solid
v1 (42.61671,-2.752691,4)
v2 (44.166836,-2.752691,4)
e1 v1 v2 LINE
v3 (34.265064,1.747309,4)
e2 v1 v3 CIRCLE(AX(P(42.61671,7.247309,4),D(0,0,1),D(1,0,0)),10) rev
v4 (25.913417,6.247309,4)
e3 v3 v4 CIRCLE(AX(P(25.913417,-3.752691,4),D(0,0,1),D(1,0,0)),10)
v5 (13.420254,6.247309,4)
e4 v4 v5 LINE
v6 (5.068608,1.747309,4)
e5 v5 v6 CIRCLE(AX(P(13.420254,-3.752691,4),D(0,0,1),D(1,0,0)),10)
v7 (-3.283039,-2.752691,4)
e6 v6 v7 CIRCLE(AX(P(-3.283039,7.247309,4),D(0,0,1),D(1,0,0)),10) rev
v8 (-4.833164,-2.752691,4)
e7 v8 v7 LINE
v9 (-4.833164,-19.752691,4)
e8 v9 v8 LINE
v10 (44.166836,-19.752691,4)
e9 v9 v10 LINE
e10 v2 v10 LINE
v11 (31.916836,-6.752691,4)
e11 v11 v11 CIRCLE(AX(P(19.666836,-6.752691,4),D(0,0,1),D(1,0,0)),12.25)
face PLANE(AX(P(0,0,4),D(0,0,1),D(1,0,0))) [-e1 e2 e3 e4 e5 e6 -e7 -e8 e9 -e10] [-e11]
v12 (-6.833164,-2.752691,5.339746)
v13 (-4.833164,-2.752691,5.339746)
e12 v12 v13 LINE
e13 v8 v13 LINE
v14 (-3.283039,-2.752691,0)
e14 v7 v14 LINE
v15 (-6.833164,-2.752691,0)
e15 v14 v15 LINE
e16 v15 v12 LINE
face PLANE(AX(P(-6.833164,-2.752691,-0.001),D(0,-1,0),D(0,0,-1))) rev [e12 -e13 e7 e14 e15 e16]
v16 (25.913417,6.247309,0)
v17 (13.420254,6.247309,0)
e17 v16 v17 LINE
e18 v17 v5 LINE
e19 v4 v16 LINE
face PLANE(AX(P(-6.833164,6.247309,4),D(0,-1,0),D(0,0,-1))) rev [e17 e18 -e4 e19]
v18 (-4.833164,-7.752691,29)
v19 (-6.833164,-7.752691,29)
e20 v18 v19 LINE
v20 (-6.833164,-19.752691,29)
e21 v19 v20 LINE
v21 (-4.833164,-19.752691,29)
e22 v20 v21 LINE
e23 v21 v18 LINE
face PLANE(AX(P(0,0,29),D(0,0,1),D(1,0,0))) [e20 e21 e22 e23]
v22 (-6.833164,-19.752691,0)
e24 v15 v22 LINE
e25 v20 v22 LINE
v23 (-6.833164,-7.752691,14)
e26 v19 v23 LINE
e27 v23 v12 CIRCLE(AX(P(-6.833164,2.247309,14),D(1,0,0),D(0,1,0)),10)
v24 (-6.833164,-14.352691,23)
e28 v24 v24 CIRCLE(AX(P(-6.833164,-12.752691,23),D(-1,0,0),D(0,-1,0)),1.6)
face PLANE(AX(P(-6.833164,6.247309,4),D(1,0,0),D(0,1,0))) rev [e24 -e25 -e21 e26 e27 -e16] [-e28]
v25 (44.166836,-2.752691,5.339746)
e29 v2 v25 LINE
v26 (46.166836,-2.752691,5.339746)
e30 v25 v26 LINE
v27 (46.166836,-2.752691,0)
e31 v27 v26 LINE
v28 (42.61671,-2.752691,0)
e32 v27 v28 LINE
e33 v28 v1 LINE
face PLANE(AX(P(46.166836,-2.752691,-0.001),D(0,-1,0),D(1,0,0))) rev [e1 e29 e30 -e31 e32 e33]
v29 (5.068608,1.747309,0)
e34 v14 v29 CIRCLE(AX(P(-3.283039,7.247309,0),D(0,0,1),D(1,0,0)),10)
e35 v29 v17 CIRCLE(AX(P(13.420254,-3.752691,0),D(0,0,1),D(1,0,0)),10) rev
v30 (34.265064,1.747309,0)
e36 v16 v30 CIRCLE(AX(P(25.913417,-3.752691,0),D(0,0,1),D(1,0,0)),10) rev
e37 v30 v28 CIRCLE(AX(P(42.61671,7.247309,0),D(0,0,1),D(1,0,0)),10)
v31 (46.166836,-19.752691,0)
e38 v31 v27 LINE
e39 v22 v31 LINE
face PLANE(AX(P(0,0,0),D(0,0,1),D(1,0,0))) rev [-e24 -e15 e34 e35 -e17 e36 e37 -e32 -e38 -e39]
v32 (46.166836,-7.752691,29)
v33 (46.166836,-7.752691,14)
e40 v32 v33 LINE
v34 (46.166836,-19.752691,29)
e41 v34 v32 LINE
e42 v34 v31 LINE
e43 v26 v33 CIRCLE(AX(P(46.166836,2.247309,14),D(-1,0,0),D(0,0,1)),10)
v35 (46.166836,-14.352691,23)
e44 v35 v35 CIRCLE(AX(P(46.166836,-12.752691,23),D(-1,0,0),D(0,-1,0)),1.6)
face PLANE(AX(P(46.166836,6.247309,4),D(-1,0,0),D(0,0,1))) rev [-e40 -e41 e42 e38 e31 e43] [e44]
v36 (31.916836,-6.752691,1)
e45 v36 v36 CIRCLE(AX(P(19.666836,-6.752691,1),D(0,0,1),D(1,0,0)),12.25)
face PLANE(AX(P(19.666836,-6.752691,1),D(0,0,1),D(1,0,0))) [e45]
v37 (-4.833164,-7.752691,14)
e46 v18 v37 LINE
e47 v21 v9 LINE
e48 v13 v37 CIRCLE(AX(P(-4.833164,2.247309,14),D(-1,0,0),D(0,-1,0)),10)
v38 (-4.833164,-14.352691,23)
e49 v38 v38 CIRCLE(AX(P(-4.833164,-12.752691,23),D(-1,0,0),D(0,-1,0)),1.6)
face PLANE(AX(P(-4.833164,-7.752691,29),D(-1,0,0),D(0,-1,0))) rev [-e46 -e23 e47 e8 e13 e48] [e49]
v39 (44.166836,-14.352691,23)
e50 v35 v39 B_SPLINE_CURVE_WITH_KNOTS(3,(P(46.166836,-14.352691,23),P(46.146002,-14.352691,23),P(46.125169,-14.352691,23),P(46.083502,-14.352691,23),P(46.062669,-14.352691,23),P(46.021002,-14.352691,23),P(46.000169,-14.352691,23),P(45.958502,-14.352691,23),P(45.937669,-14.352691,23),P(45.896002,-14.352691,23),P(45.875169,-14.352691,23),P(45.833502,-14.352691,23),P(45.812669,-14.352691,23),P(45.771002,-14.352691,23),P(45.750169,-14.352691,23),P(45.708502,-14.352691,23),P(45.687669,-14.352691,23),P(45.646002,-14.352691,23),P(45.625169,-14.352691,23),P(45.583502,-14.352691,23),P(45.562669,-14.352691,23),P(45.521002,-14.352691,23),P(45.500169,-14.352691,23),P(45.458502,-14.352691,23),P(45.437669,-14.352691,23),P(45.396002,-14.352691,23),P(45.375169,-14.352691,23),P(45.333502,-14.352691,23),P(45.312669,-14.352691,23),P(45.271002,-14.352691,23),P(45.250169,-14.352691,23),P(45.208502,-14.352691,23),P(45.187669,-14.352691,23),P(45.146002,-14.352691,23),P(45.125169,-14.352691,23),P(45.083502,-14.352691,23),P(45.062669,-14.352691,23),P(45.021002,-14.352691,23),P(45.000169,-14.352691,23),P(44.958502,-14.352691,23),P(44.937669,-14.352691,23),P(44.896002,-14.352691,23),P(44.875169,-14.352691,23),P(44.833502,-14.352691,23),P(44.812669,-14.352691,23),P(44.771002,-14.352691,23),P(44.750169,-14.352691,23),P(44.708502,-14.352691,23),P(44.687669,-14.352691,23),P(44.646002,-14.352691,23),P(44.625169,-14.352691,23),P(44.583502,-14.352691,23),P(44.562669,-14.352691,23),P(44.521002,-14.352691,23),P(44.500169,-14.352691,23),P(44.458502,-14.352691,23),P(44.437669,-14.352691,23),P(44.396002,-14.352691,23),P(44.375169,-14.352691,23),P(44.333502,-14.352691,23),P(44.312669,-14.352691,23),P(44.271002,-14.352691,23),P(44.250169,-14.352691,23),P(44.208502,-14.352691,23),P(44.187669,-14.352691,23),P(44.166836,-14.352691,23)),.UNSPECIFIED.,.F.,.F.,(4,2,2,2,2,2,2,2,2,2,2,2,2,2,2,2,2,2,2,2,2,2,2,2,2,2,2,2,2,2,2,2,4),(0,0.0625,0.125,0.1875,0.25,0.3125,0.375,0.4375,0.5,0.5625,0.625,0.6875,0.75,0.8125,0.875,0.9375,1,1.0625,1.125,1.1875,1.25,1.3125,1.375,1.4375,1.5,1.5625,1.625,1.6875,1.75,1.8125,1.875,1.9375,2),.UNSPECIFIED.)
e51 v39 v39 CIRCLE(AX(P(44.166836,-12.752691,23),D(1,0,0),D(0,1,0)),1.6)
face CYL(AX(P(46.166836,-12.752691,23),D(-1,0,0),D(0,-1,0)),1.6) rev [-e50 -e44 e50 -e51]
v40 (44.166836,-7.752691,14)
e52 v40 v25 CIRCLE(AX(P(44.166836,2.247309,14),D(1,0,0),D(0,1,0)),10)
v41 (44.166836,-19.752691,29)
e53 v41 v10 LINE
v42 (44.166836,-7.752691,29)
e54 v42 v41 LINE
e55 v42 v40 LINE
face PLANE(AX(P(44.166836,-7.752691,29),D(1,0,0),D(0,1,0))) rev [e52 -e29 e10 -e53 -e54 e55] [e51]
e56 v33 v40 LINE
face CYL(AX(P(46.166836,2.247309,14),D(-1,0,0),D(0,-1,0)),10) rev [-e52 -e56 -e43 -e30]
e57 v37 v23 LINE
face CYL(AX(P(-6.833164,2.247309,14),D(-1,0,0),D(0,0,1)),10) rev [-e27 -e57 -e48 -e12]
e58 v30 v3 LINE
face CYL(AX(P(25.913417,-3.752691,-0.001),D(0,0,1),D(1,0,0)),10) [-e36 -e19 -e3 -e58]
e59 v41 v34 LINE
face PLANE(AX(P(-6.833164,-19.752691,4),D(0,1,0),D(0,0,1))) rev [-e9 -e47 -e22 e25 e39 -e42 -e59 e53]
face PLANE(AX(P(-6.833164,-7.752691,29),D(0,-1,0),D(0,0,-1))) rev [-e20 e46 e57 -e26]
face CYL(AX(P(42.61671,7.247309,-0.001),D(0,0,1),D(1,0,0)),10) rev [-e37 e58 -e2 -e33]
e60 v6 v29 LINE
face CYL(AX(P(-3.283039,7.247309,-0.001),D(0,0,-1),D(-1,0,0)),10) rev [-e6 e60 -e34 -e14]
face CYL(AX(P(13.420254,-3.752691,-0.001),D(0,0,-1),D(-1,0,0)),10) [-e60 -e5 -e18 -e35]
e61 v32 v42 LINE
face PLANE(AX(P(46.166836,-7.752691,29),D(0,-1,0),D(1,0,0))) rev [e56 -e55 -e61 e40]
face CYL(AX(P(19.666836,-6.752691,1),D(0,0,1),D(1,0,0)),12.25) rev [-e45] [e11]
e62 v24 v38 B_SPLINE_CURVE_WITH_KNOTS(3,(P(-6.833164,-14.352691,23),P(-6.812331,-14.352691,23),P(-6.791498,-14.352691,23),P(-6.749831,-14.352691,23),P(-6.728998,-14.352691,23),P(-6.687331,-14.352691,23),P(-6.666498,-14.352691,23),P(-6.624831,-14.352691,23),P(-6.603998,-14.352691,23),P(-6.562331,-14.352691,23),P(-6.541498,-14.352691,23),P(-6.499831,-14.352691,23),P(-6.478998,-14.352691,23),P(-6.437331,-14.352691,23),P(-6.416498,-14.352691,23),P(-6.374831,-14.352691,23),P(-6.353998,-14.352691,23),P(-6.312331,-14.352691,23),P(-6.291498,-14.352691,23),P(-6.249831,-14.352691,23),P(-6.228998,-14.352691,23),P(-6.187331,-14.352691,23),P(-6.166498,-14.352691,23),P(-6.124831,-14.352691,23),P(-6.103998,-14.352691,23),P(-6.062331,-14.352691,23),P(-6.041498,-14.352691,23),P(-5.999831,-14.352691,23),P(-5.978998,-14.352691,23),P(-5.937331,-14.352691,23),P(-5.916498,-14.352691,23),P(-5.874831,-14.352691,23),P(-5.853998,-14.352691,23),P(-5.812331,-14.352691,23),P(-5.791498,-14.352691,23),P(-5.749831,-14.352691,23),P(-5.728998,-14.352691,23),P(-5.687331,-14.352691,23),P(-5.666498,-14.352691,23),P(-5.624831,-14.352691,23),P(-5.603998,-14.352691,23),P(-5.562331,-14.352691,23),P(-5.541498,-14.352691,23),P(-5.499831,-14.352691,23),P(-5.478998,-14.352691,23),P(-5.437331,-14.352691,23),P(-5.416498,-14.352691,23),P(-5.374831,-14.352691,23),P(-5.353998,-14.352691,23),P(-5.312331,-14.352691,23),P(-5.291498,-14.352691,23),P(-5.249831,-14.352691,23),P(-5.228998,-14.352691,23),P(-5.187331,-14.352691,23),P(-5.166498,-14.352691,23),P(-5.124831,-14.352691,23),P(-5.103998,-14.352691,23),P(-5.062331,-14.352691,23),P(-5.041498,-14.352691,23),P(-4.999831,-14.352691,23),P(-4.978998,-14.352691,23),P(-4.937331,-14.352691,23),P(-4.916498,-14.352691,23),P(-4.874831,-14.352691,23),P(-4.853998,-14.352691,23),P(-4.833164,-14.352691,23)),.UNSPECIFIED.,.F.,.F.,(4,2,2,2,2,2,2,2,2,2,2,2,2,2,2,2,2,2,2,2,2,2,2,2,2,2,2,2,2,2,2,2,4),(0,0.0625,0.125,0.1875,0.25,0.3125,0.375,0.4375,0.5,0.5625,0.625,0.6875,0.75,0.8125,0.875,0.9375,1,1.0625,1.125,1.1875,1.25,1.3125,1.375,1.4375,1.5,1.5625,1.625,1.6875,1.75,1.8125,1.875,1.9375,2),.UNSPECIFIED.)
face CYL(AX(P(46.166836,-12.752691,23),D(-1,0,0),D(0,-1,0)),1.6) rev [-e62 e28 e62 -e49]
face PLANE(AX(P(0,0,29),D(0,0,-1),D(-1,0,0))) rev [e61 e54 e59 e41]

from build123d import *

# Parameters (mm, degrees)
SKETCH1_W           = 53
SKETCH1_H           = 26
BOSS_EXTRUDE2_DEPTH = 4
SKETCH3_R           = 12.25
CUT_EXTRUDE2_DEPTH  = 3
CUT_EXTRUDE3_REACH  = 52.374
SKETCH4_W           = 13.5
SKETCH4_H           = 9
FILLET1_R           = 10
FILLET2_R           = 10
SKETCH5_W           = 2
SKETCH5_H           = 12
BOSS_EXTRUDE3_DEPTH = 25
SKETCH6_R           = 1.6
CUT_EXTRUDE4_DEPTH  = 64.562322282
FILLET3_R           = 10


with BuildPart() as part:
    # Sketch1 → Boss-Extrude2 (new body)
    with BuildSketch(Plane.XY):
        with Locations((19.666835682, -6.752691308)):
            Rectangle(SKETCH1_W, SKETCH1_H)
    extrude(amount=BOSS_EXTRUDE2_DEPTH)

    # Sketch3 → Cut-Extrude2 (cut)
    with BuildSketch(Plane.XY.offset(4)):
        with Locations((19.666835682, -6.752691308)):
            Circle(SKETCH3_R)
    extrude(amount=-CUT_EXTRUDE2_DEPTH, mode=Mode.SUBTRACT)

    # Sketch4 → Cut-Extrude3 (cut, up to next)
    with BuildSketch(Plane.XY.offset(4), mode=Mode.PRIVATE) as cut_extrude3_sk1:
        with Locations((-0.083164318, 1.747308692)):
            Rectangle(SKETCH4_W, SKETCH4_H)
    cut_extrude3_tool1 = extrude(cut_extrude3_sk1.sketch, amount=-CUT_EXTRUDE3_REACH, mode=Mode.PRIVATE) & part.part
    # Sketch4 → Cut-Extrude3 (cut, up to next)
    with BuildSketch(Plane.XY.offset(4), mode=Mode.PRIVATE) as cut_extrude3_sk2:
        with Locations((39.416835682, 1.747308692)):
            Rectangle(SKETCH4_W, SKETCH4_H)
    cut_extrude3_tool2 = extrude(cut_extrude3_sk2.sketch, amount=-CUT_EXTRUDE3_REACH, mode=Mode.PRIVATE) & part.part
    add(cut_extrude3_tool1.solids().sort_by_distance((-0.083164, 1.747309, 4))[0], mode=Mode.SUBTRACT)
    add(cut_extrude3_tool2.solids().sort_by_distance((39.416836, 1.747309, 4))[0], mode=Mode.SUBTRACT)

    # Fillet1
    # the kernel refuses this fillet: 10 mm, written as the material it adds along each edge
    with BuildSketch(Plane(origin=(32.666835682, -2.752691308, 4), x_dir=(0, 1, 0), z_dir=(0, 0, -1))) as fillet1_piece_1:
        with BuildLine():
            CenterArc((10, 9.949874371), FILLET1_R, 180, 84.260829523)
            Line((0, 9.949874371), (-0.2, 9.949874371))
            Line((-0.2, 9.949874371), (-0.2, 0))
            Line((-0.2, 0), (0, -0.2))
            ThreePointArc((0, -0.2), (4.5, -0.2), (8.98, -0.198997487))
            Line((8.98, -0.198997487), (9, 0))
        make_face()
    extrude(amount=4)
    with BuildSketch(Plane(origin=(6.666835682, -2.752691308, 4), x_dir=(0, 1, 0), z_dir=(0, 0, -1))) as fillet1_piece_2:
        with BuildLine():
            CenterArc((10, -9.949874371), FILLET1_R, 95.739170477, 84.260829523)
            Line((0, -9.949874371), (-0.2, -9.949874371))
            Line((-0.2, -9.949874371), (-0.2, 0))
            Line((-0.2, 0), (0, 0.2))
            ThreePointArc((0, 0.2), (4.5, 0.2), (8.98, 0.198997487))
            Line((8.98, 0.198997487), (9, 0))
        make_face()
    extrude(amount=4)

    # Fillet2
    fillet2_edges = [part.edges().sort_by_distance(p)[0] for p in [
        (6.666835682, 6.247308692, 2),
        (32.666835682, 6.247308692, 2),
    ]]
    fillet(fillet2_edges, radius=FILLET2_R)

    # Sketch5 → Boss-Extrude3 (add)
    with BuildSketch(Plane.XY.offset(4)):
        with Locations((-5.833164318, -13.752691308)):
            Rectangle(SKETCH5_W, SKETCH5_H)
        with Locations((45.166835682, -13.752691308)):
            Rectangle(SKETCH5_W, SKETCH5_H)
    extrude(amount=BOSS_EXTRUDE3_DEPTH)

    # Sketch6 → Cut-Extrude4 (cut, through all)
    with BuildSketch(Plane.ZY.offset(6.833164318)):
        with Locations(Location((23, -12.752691308, 0), (0, 0, 270))):
            Circle(SKETCH6_R)
    extrude(amount=-CUT_EXTRUDE4_DEPTH, mode=Mode.SUBTRACT)

    # Fillet3
    # the kernel refuses this fillet: 10 mm, written as the material it adds along each edge
    with BuildSketch(Plane(origin=(44.166835682, -7.752691308, 4), x_dir=(0, 1, 0), z_dir=(1, 0, 0))) as fillet3_piece_1_section:
        with BuildLine():
            CenterArc((FILLET3_R, FILLET3_R), FILLET3_R, 180, 90)
            Line((0, FILLET3_R), (0, 0))
            Line((0, 0), (FILLET3_R, 0))
        make_face()
    fillet3_piece_1 = extrude(amount=2, mode=Mode.PRIVATE)
    fillet3_piece_1 = split(fillet3_piece_1, bisect_by=Plane(origin=(45.166835682, -2.752691308, 6.440248494), z_dir=(0, -1, 0)), keep=Keep.TOP, mode=Mode.PRIVATE)
    add(fillet3_piece_1)
    with BuildSketch(Plane(origin=(-6.833164318, -7.752691308, 4), x_dir=(0, 1, 0), z_dir=(1, 0, 0))) as fillet3_piece_2_section:
        with BuildLine():
            CenterArc((FILLET3_R, FILLET3_R), FILLET3_R, 180, 90)
            Line((0, FILLET3_R), (0, 0))
            Line((0, 0), (FILLET3_R, 0))
        make_face()
    fillet3_piece_2 = extrude(amount=2, mode=Mode.PRIVATE)
    fillet3_piece_2 = split(fillet3_piece_2, bisect_by=Plane(origin=(-5.833164318, -2.752691308, 6.440248494), z_dir=(0, -1, 0)), keep=Keep.TOP, mode=Mode.PRIVATE)
    add(fillet3_piece_2)


solid = part.part
